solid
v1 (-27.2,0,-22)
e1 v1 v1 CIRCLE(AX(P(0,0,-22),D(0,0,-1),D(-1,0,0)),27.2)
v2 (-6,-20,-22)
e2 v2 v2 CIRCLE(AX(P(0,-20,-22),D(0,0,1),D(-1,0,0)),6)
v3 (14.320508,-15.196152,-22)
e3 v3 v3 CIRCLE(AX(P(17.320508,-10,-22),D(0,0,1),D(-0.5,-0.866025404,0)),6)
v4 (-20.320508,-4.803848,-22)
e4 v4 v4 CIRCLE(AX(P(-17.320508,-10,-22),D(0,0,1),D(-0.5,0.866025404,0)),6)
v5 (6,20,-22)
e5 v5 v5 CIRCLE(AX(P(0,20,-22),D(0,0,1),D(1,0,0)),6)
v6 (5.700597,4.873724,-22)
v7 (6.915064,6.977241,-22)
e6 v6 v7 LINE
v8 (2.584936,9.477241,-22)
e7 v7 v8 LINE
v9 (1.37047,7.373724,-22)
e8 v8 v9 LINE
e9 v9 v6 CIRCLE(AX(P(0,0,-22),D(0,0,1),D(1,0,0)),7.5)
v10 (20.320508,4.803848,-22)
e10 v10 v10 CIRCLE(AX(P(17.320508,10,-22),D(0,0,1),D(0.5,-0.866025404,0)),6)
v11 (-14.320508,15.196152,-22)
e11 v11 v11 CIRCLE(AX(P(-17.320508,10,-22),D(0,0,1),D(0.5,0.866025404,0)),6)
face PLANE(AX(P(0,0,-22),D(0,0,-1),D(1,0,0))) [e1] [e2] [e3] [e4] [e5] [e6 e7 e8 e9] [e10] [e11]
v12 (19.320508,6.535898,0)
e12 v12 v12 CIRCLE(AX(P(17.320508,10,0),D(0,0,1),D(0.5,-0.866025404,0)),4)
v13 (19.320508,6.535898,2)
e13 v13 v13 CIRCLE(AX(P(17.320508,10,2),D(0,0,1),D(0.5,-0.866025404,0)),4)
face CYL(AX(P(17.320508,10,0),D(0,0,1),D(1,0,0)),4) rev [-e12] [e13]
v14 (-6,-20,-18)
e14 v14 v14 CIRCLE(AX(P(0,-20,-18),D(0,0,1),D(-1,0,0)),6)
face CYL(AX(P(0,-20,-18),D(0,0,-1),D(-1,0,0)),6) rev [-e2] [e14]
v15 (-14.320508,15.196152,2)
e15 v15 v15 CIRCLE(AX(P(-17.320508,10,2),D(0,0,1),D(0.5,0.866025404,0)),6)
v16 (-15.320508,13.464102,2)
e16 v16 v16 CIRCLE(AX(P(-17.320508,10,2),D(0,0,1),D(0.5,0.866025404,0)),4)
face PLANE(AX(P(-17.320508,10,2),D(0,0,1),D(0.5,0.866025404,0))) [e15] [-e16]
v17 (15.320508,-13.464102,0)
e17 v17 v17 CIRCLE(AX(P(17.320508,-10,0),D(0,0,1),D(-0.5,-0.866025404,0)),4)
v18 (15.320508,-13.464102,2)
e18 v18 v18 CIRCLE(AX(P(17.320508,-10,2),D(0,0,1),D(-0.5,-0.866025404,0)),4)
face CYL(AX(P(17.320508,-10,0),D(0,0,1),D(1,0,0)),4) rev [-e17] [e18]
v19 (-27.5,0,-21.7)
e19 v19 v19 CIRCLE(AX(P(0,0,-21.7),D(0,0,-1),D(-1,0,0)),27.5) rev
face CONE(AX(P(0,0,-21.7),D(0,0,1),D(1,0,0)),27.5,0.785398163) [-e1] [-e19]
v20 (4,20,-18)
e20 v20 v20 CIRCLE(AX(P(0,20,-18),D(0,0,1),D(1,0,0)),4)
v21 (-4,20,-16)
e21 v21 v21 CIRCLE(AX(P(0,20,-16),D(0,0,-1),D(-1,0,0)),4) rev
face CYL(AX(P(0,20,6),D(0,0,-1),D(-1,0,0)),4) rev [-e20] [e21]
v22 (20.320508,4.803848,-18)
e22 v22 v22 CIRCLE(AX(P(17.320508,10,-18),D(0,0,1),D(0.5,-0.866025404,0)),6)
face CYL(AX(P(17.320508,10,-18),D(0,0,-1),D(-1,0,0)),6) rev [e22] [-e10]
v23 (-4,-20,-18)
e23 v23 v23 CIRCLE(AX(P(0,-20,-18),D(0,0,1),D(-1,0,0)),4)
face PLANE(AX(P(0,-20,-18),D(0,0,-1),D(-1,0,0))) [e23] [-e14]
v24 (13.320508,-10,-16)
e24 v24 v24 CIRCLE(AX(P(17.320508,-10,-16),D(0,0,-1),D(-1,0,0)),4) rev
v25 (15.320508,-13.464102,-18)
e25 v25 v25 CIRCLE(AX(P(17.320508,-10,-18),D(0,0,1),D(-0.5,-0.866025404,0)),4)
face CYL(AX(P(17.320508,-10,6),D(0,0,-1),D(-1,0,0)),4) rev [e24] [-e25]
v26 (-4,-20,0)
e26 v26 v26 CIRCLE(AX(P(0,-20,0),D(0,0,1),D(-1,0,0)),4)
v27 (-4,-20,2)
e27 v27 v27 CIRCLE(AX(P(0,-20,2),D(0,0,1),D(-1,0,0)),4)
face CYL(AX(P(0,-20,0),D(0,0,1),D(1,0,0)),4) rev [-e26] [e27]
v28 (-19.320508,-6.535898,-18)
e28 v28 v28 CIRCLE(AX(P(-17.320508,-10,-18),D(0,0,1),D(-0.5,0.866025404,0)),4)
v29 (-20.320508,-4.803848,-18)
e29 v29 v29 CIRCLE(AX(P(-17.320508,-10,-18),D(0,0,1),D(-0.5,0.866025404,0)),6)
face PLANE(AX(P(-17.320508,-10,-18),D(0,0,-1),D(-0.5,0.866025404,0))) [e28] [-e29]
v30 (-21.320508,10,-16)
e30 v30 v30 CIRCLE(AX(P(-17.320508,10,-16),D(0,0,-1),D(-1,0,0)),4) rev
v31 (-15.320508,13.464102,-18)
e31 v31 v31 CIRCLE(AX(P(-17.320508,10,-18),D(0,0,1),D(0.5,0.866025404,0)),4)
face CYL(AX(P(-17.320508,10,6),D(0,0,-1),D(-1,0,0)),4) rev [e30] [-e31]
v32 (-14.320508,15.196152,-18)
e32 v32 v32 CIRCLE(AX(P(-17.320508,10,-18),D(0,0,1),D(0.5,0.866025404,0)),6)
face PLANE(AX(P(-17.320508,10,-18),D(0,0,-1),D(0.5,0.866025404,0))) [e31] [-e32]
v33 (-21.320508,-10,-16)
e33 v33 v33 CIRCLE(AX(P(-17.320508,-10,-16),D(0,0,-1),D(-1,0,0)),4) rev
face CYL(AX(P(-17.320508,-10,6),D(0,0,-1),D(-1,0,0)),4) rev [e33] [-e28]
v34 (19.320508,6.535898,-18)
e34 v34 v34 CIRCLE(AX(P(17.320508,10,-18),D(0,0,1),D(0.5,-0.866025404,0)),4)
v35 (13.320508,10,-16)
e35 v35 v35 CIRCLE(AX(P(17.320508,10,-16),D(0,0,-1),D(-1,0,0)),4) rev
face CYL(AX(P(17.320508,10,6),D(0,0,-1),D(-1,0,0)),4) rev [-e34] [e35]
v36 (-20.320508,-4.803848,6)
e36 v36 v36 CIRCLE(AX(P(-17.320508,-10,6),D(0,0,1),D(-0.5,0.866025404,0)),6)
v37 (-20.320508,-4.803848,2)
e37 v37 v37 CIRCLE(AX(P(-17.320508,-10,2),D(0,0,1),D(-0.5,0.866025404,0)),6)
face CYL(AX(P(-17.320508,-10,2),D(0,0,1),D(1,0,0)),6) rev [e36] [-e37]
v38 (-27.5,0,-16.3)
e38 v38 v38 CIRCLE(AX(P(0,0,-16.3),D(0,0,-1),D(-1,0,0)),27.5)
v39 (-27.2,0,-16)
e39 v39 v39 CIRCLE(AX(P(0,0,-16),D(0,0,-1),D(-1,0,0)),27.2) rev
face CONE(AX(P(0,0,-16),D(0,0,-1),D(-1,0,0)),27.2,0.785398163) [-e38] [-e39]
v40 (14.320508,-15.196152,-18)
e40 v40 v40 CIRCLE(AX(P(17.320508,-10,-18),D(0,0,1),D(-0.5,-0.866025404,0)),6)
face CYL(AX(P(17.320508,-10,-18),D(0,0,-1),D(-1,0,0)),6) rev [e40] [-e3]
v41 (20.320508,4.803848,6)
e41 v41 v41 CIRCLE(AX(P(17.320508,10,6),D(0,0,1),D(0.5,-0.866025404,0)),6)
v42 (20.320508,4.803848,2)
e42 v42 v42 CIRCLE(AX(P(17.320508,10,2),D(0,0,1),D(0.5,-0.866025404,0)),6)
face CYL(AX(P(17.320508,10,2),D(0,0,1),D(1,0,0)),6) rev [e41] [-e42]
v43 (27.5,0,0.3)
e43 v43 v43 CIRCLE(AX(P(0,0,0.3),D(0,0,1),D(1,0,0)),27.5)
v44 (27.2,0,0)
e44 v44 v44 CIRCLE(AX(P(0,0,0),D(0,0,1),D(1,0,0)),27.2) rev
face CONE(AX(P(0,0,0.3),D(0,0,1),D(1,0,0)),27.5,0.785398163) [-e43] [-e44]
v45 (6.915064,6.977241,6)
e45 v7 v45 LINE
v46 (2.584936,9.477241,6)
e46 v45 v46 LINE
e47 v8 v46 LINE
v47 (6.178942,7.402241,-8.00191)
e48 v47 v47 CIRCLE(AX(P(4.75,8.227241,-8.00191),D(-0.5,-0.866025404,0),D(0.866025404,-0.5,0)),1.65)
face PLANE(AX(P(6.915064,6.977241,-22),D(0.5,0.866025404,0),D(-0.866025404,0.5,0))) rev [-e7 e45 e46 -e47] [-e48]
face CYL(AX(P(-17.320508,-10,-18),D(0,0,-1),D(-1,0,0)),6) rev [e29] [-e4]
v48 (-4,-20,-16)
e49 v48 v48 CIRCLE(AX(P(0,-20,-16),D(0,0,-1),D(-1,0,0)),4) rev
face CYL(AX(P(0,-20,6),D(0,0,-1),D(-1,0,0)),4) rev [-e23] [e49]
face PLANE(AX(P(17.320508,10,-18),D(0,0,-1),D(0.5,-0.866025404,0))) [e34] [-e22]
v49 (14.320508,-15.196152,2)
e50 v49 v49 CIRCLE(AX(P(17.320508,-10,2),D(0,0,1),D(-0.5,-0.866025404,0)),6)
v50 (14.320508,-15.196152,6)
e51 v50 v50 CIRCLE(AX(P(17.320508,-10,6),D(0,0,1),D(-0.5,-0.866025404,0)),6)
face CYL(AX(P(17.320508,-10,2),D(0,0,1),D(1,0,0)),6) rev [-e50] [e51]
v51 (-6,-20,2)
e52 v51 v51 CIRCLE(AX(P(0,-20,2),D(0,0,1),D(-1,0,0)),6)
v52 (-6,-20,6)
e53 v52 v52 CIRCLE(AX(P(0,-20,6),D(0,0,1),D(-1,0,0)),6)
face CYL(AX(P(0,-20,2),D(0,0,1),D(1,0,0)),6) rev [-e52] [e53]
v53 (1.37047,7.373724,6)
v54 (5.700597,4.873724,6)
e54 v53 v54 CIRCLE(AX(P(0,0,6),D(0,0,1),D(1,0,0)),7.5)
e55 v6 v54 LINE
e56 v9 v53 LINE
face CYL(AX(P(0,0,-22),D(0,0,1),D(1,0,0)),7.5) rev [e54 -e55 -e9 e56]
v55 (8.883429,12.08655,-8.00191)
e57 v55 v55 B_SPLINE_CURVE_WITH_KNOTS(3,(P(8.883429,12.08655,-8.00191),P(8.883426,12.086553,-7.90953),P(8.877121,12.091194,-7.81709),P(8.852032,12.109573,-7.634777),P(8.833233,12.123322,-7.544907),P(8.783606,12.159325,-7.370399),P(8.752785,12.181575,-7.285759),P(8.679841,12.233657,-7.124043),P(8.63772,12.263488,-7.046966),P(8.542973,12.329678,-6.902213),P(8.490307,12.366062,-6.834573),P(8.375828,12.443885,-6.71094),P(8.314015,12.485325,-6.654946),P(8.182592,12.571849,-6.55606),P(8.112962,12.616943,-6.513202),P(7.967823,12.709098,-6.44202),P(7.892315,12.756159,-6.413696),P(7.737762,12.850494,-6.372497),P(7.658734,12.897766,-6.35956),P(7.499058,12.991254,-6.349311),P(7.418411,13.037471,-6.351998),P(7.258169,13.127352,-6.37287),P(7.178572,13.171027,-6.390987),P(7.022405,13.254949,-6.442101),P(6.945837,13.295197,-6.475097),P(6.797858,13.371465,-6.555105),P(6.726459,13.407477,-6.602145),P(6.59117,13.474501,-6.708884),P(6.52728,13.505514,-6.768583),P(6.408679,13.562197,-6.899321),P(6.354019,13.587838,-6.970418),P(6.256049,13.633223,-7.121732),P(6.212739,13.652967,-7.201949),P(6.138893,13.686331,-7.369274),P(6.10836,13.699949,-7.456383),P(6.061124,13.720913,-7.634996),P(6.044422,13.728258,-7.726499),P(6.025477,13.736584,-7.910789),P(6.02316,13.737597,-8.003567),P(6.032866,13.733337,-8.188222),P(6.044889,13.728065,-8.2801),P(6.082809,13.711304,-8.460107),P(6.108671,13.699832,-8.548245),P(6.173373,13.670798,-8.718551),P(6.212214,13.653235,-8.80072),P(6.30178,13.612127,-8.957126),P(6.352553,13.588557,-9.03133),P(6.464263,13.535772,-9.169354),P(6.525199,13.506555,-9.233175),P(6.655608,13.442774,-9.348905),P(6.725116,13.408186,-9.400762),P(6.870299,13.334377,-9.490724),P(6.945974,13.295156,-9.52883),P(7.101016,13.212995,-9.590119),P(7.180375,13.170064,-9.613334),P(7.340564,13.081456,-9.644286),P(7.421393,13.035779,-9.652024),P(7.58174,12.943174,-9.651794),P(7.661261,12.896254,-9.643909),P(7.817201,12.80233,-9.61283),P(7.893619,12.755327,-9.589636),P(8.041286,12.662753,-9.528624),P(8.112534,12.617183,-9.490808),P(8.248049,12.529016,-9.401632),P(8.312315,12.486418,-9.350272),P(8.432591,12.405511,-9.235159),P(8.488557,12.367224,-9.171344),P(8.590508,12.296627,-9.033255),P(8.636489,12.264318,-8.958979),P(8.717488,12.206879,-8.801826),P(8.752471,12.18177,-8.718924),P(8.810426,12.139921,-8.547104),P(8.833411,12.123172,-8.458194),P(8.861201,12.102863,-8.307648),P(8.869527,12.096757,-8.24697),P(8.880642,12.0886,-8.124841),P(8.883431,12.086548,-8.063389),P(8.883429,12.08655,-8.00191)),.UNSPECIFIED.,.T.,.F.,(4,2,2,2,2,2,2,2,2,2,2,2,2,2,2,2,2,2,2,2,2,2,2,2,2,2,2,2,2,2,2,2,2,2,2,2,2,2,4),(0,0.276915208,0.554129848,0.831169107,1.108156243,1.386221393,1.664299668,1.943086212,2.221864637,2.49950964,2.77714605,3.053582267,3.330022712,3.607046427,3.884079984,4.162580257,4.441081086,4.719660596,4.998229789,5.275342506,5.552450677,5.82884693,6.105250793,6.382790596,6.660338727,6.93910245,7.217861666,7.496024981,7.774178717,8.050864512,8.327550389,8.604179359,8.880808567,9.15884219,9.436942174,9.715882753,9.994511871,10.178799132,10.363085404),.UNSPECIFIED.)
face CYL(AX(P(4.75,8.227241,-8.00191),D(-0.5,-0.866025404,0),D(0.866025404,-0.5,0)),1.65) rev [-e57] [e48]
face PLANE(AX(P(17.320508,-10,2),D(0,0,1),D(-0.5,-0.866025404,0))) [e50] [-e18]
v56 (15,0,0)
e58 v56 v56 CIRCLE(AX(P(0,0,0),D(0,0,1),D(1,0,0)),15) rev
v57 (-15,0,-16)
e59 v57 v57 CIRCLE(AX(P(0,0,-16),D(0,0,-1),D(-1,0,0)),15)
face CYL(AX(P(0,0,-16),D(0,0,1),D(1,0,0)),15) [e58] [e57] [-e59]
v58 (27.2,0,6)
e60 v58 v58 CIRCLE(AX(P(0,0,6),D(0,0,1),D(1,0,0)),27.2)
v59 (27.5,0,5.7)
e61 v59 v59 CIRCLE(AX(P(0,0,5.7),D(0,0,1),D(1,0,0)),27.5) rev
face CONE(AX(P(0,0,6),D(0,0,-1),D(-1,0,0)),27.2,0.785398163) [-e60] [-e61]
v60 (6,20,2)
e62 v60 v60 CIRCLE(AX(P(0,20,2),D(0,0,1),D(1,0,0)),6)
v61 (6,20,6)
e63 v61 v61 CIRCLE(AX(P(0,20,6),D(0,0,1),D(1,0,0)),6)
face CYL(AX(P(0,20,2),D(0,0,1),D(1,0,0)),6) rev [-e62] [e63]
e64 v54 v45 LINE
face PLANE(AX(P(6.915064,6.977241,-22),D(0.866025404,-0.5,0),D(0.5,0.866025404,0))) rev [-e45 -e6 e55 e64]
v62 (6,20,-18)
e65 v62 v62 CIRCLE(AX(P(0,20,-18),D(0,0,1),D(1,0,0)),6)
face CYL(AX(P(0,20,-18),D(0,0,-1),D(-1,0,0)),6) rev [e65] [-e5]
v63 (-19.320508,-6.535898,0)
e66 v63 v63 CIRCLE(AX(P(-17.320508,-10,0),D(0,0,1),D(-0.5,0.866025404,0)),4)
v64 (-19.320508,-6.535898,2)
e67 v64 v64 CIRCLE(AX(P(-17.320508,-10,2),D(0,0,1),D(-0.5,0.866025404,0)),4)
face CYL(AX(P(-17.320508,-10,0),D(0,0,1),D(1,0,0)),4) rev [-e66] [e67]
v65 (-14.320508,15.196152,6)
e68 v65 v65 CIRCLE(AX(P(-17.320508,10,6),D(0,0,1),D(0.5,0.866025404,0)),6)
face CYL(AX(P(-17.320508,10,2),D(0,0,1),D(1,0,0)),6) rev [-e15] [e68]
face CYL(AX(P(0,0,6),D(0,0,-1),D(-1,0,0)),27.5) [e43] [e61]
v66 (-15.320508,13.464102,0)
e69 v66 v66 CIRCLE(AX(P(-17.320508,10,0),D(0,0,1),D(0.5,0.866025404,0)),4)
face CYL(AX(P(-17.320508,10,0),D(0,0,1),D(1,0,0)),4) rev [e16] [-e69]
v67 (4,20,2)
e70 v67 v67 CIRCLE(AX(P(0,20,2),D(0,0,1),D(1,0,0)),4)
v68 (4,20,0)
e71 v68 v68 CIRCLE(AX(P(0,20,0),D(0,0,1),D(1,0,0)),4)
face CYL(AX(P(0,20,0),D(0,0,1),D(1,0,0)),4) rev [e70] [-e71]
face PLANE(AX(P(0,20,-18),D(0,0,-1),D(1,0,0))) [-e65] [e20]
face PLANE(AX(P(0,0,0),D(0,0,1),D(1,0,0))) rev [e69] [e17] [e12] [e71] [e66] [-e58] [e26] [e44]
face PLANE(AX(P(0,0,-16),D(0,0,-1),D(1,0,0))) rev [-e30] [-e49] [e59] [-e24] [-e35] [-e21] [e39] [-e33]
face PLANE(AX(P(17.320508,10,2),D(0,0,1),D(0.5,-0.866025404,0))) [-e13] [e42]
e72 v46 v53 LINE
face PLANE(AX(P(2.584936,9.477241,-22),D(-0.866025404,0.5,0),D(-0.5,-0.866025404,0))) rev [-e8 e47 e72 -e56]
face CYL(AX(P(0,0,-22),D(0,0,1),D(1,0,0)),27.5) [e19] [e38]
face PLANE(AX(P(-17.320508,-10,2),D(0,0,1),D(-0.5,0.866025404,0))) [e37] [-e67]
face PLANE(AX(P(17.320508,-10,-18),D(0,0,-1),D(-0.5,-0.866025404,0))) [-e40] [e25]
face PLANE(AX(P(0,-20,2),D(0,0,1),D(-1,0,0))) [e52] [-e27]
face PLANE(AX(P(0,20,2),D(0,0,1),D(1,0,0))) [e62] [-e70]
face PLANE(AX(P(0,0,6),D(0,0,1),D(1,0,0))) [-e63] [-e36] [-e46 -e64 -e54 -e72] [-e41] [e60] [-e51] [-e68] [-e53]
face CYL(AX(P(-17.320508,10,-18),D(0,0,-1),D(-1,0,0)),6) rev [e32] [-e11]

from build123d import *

# Parameters (mm, degrees)
EXTRUDE_1_OUTLINE_R       = 27.5
EXTRUDE_1_DEPTH           = 6
SKETCH_2_R                = 6
CUT_EXTRUDE_1_DEPTH       = 4
SKETCH_3_R                = 4
CUT_EXTRUDE_2_DEPTH       = 40.096035605
PATTERN_CIRCULAR_1_COUNT  = 6
SKETCH_4_R                = 15
EXTRUDE_2_DEPTH           = 16
MIRROR_1_COPY_1_SKETCH_R  = 6
MIRROR_1_COPY_1_DEPTH     = 4
MIRROR_1_COPY_2_SKETCH_R  = 6
MIRROR_1_COPY_2_DEPTH     = 4
MIRROR_1_COPY_3_SKETCH_R  = 6
MIRROR_1_COPY_3_DEPTH     = 4
MIRROR_1_COPY_4_SKETCH_R  = 6
MIRROR_1_COPY_4_DEPTH     = 4
MIRROR_1_COPY_5_SKETCH_R  = 6
MIRROR_1_COPY_5_DEPTH     = 4
MIRROR_1_COPY_6_SKETCH_R  = 4
MIRROR_1_COPY_6_DEPTH     = 40.096035605
MIRROR_1_COPY_7_SKETCH_R  = 4
MIRROR_1_COPY_7_DEPTH     = 40.096035605
MIRROR_1_COPY_8_SKETCH_R  = 4
MIRROR_1_COPY_8_DEPTH     = 40.096035605
MIRROR_1_COPY_9_SKETCH_R  = 4
MIRROR_1_COPY_9_DEPTH     = 40.096035605
MIRROR_1_COPY_10_SKETCH_R = 4
MIRROR_1_COPY_10_DEPTH    = 40.096035605
CUT_EXTRUDE_3_DEPTH       = 48.921811318
CHAMFER_1_SIZE            = 0.3
SKETCH_7_W                = 1.65
SKETCH_7_H                = 28.065698604


# Read off the part's stored shape, not the designer's step: 凸台-拉伸1
with BuildPart() as part:
    # 凸台-拉伸1 outline → 凸台-拉伸1 (new body)
    with BuildSketch(Plane.XY):
        Circle(EXTRUDE_1_OUTLINE_R)
    extrude_1 = extrude(amount=EXTRUDE_1_DEPTH)

    # 草图2 → 切除-拉伸1 (cut)
    with BuildSketch(Plane.XY.offset(6)):
        with Locations((0, 20)):
            Circle(SKETCH_2_R)
    cut_extrude_1 = extrude(amount=-CUT_EXTRUDE_1_DEPTH, mode=Mode.SUBTRACT)

    # 草图3 → 切除-拉伸2 (cut, through all)
    with BuildSketch(Plane.XY.offset(2)):
        with Locations((0, 20)):
            Circle(SKETCH_3_R)
    cut_extrude_2 = extrude(amount=-CUT_EXTRUDE_2_DEPTH, mode=Mode.SUBTRACT)

    # 阵列(圆周)1: 切除-拉伸1, 切除-拉伸2 ×6 about axis
    pattern_circular_1_axis = Axis((0, 0, 0), (0, 0, 1))
    add([cut_extrude_1.rotate(pattern_circular_1_axis, i * 360 / PATTERN_CIRCULAR_1_COUNT) for i in range(1, PATTERN_CIRCULAR_1_COUNT)], mode=Mode.SUBTRACT)
    add([cut_extrude_2.rotate(pattern_circular_1_axis, i * 360 / PATTERN_CIRCULAR_1_COUNT) for i in range(1, PATTERN_CIRCULAR_1_COUNT)], mode=Mode.SUBTRACT)

    # 草图4 → 凸台-拉伸2 (add)
    with BuildSketch(Plane(origin=(0, 0, 0), x_dir=(-1, 0, 0), z_dir=(0, 0, -1))):
        with Locations(Location((0, 0, 0), (0, 0, 180))):
            Circle(SKETCH_4_R)
    extrude(amount=EXTRUDE_2_DEPTH)

    # 镜向1: 凸台-拉伸1, 切除-拉伸1, 切除-拉伸2 across plane
    add(extrude_1.mirror(Plane(origin=(0, 0, -8), x_dir=(1, 0, 0), z_dir=(0, 0, -1))))
    add(cut_extrude_1.mirror(Plane(origin=(0, 0, -8), x_dir=(1, 0, 0), z_dir=(0, 0, -1))), mode=Mode.SUBTRACT)
    add(cut_extrude_2.mirror(Plane(origin=(0, 0, -8), x_dir=(1, 0, 0), z_dir=(0, 0, -1))), mode=Mode.SUBTRACT)

    # 镜向1 copy 1 sketch → 镜向1 copy 1 (cut)
    with BuildSketch(Plane(origin=(0, 0, -22), x_dir=(0.5000000000000001, 0.8660254037844386, 0), z_dir=(0, 0, -1))):
        with Locations((0, -20)):
            Circle(MIRROR_1_COPY_1_SKETCH_R)
    extrude(amount=-MIRROR_1_COPY_1_DEPTH, mode=Mode.SUBTRACT)

    # 镜向1 copy 2 sketch → 镜向1 copy 2 (cut)
    with BuildSketch(Plane(origin=(0, 0, -22), x_dir=(-0.4999999999999998, 0.8660254037844387, 0), z_dir=(0, 0, -1))):
        with Locations((0, -20)):
            Circle(MIRROR_1_COPY_2_SKETCH_R)
    extrude(amount=-MIRROR_1_COPY_2_DEPTH, mode=Mode.SUBTRACT)

    # 镜向1 copy 3 sketch → 镜向1 copy 3 (cut)
    with BuildSketch(Plane(origin=(0, 0, -22), x_dir=(-1, 0, 0), z_dir=(0, 0, -1))):
        with Locations((0, -20)):
            Circle(MIRROR_1_COPY_3_SKETCH_R)
    extrude(amount=-MIRROR_1_COPY_3_DEPTH, mode=Mode.SUBTRACT)

    # 镜向1 copy 4 sketch → 镜向1 copy 4 (cut)
    with BuildSketch(Plane(origin=(0, 0, -22), x_dir=(-0.5000000000000004, -0.8660254037844384, 0), z_dir=(0, 0, -1))):
        with Locations((0, -20)):
            Circle(MIRROR_1_COPY_4_SKETCH_R)
    extrude(amount=-MIRROR_1_COPY_4_DEPTH, mode=Mode.SUBTRACT)

    # 镜向1 copy 5 sketch → 镜向1 copy 5 (cut)
    with BuildSketch(Plane(origin=(0, 0, -22), x_dir=(0.5000000000000001, -0.8660254037844386, 0), z_dir=(0, 0, -1))):
        with Locations((0, -20)):
            Circle(MIRROR_1_COPY_5_SKETCH_R)
    extrude(amount=-MIRROR_1_COPY_5_DEPTH, mode=Mode.SUBTRACT)

    # 镜向1 copy 6 sketch → 镜向1 copy 6 (cut, through all)
    with BuildSketch(Plane(origin=(0, 0, -18), x_dir=(0.5000000000000001, 0.8660254037844386, 0), z_dir=(0, 0, -1))):
        with Locations((0, -20)):
            Circle(MIRROR_1_COPY_6_SKETCH_R)
    extrude(amount=-MIRROR_1_COPY_6_DEPTH, mode=Mode.SUBTRACT)

    # 镜向1 copy 7 sketch → 镜向1 copy 7 (cut, through all)
    with BuildSketch(Plane(origin=(0, 0, -18), x_dir=(-0.4999999999999998, 0.8660254037844387, 0), z_dir=(0, 0, -1))):
        with Locations((0, -20)):
            Circle(MIRROR_1_COPY_7_SKETCH_R)
    extrude(amount=-MIRROR_1_COPY_7_DEPTH, mode=Mode.SUBTRACT)

    # 镜向1 copy 8 sketch → 镜向1 copy 8 (cut, through all)
    with BuildSketch(Plane(origin=(0, 0, -18), x_dir=(-1, 0, 0), z_dir=(0, 0, -1))):
        with Locations((0, -20)):
            Circle(MIRROR_1_COPY_8_SKETCH_R)
    extrude(amount=-MIRROR_1_COPY_8_DEPTH, mode=Mode.SUBTRACT)

    # 镜向1 copy 9 sketch → 镜向1 copy 9 (cut, through all)
    with BuildSketch(Plane(origin=(0, 0, -18), x_dir=(-0.5000000000000004, -0.8660254037844384, 0), z_dir=(0, 0, -1))):
        with Locations((0, -20)):
            Circle(MIRROR_1_COPY_9_SKETCH_R)
    extrude(amount=-MIRROR_1_COPY_9_DEPTH, mode=Mode.SUBTRACT)

    # 镜向1 copy 10 sketch → 镜向1 copy 10 (cut, through all)
    with BuildSketch(Plane(origin=(0, 0, -18), x_dir=(0.5000000000000001, -0.8660254037844386, 0), z_dir=(0, 0, -1))):
        with Locations((0, -20)):
            Circle(MIRROR_1_COPY_10_SKETCH_R)
    extrude(amount=-MIRROR_1_COPY_10_DEPTH, mode=Mode.SUBTRACT)

    # 草图5 → 切除-拉伸3 (cut, through all)
    with BuildSketch(Plane.XY.offset(6)):
        with BuildLine():
            Line((6.915063509, 6.977241336), (2.584936491, 9.477241336))
            Line((2.584936491, 9.477241336), (1.370470396, 7.373724357))
            ThreePointArc((1.370470396, 7.373724357), (-3.75, -6.495190528), (5.700597415, 4.873724357))
            Line((5.700597415, 4.873724357), (6.915063509, 6.977241336))
        make_face()
    extrude(amount=-CUT_EXTRUDE_3_DEPTH, mode=Mode.SUBTRACT)

    # 倒角1
    chamfer_1_edges = [part.edges().sort_by_distance(p)[0] for p in [
        (-27.5, 0, 0),
        (-27.5, 0, 6),
        (-27.5, 0, -16),
        (-27.5, 0, -22),
    ]]
    chamfer(chamfer_1_edges, length=CHAMFER_1_SIZE)

    # 草图7 → M4 螺纹孔1 (revolve, cut)
    with BuildSketch(Plane(origin=(4.75, 8.227241336, -8.001910076), x_dir=(0.866025403784438, -0.5000000000000012, 0), z_dir=(0, 0, 1))):
        with Locations((0.825, 14.032849302)):
            Rectangle(SKETCH_7_W, SKETCH_7_H)
    revolve(axis=Axis((1.575, 2.727980022, -8.001910076), (0.5000000000000012, 0.8660254037844379, 0)), mode=Mode.SUBTRACT)


solid = part.part
